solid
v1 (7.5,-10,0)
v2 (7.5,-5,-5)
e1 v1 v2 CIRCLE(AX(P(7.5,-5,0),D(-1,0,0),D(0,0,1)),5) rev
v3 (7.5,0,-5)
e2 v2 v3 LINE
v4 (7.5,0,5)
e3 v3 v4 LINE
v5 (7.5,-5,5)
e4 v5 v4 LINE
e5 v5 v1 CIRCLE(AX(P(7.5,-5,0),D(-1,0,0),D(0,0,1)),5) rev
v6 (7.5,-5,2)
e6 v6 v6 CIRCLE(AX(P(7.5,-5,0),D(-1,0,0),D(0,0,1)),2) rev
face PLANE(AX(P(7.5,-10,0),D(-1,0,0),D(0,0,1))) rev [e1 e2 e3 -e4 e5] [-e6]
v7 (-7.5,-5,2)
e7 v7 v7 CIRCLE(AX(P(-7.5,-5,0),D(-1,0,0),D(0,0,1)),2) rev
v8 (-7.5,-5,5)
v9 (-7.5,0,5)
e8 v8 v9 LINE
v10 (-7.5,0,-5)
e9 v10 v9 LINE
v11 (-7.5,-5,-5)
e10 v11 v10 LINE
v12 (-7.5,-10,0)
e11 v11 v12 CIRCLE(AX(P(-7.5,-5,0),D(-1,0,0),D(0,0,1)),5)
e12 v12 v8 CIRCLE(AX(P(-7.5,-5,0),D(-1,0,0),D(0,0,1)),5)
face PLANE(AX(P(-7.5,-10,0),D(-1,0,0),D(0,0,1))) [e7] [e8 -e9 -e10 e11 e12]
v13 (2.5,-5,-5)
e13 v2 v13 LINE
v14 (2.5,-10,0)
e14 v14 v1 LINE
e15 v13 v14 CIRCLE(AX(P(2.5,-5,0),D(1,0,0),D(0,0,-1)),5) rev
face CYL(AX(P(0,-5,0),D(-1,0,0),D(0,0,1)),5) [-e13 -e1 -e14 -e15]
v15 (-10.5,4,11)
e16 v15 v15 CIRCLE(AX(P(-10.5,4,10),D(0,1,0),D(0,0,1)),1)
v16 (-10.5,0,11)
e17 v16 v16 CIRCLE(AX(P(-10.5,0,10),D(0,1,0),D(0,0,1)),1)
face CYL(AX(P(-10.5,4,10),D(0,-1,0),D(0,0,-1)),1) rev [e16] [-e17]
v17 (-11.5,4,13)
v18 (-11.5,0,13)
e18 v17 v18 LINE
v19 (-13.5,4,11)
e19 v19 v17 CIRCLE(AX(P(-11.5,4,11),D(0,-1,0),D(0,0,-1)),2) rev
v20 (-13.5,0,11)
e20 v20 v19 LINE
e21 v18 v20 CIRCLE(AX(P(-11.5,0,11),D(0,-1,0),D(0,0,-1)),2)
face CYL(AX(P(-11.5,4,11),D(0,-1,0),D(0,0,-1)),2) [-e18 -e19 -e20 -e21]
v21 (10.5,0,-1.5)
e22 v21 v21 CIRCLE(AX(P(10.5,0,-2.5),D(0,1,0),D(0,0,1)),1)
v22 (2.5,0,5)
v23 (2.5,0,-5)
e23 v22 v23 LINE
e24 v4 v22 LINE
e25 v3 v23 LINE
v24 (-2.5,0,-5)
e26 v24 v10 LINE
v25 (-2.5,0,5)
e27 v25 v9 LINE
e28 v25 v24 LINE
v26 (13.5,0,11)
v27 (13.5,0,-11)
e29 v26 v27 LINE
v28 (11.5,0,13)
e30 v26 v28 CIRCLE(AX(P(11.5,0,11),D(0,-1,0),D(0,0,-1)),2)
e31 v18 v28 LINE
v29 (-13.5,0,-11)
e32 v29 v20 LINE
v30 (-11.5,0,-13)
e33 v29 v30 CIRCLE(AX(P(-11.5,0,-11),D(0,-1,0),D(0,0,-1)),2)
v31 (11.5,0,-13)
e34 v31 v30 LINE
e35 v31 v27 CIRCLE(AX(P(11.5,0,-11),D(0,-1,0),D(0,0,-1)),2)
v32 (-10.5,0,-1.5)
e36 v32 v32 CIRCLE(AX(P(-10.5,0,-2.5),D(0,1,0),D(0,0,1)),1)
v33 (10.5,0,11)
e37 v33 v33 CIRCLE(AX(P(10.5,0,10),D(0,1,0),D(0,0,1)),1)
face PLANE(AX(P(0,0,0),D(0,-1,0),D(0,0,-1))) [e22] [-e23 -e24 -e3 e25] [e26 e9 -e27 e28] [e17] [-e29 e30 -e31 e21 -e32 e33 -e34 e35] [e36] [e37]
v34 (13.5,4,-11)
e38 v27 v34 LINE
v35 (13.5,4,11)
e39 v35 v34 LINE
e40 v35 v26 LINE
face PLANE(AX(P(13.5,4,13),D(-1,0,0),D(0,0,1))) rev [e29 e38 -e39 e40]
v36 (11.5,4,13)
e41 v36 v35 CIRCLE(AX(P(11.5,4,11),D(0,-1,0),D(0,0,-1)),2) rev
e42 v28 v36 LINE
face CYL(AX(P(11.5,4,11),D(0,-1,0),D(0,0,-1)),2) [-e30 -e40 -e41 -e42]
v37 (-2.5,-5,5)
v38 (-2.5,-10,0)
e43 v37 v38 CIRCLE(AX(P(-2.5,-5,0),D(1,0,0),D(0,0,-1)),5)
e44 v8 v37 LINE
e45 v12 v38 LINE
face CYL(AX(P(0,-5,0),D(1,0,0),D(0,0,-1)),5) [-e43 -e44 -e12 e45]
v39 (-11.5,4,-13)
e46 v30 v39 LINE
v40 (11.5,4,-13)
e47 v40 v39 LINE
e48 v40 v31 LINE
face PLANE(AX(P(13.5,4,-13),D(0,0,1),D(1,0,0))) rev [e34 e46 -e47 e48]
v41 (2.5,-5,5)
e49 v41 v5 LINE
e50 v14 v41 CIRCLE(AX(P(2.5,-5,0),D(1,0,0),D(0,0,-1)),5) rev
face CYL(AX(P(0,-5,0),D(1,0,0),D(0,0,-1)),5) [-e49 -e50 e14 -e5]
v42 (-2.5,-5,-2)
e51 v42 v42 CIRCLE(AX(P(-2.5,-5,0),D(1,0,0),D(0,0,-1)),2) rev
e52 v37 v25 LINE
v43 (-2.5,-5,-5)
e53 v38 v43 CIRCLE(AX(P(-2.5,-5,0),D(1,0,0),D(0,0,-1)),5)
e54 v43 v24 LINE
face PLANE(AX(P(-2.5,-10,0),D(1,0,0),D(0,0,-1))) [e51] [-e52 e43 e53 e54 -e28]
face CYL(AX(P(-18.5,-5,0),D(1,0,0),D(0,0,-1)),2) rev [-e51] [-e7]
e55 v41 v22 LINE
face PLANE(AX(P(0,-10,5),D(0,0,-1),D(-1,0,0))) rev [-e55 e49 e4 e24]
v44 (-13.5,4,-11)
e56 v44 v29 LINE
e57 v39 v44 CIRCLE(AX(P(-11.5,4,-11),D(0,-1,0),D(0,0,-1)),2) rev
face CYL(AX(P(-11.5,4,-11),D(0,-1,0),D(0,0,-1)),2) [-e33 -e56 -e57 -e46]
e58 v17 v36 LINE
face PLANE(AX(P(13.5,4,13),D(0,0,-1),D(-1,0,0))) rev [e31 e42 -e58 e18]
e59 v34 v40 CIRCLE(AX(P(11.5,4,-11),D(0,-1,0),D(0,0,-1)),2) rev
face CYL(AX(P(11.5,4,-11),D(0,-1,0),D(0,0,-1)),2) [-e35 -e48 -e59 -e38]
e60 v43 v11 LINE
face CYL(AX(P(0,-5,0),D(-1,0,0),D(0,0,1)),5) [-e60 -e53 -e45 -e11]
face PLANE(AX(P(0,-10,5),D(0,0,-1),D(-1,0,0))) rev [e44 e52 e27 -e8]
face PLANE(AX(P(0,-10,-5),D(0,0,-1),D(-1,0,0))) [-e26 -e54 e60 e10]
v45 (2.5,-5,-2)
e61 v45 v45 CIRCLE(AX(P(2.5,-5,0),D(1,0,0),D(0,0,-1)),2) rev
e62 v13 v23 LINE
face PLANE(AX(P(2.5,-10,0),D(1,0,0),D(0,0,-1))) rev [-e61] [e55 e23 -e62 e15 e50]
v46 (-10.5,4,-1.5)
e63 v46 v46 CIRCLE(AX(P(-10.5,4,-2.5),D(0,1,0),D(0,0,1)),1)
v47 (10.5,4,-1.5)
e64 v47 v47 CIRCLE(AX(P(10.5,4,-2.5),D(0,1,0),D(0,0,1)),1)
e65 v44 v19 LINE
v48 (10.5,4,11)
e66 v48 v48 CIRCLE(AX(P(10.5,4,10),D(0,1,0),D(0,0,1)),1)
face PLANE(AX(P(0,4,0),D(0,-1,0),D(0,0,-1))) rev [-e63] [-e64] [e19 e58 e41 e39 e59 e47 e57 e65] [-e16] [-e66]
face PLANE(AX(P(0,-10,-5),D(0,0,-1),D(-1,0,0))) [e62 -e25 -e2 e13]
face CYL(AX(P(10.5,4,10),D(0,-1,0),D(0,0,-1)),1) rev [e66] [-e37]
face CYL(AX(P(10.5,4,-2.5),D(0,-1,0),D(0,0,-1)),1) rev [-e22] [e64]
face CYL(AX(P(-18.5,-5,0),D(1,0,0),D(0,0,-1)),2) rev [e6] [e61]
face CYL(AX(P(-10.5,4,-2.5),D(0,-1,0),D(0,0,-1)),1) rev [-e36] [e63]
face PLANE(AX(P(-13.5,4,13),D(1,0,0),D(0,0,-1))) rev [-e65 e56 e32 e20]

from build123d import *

# Parameters (mm, degrees)
SKETCH1_W               = 27
SKETCH1_H               = 26
SKETCH1_R               = 1
BOSS_EXTRUDE1_DEPTH     = 4
SKETCH2_W               = 5
SKETCH2_H               = 10
BOSS_EXTRUDE2_DEPTH     = 10
FILLET1_R               = 5
CUT_EXTRUDE1_DEPTH      = 11
CUT_EXTRUDE1_DEPTH_BACK = 22
SKETCH4_R               = 2
FILLET2_R               = 2


with BuildPart() as part:
    # Sketch1 → Boss-Extrude1 (new body)
    with BuildSketch(Plane(origin=(0, 0, 0), x_dir=(1, 0, 0), z_dir=(0, 1, 0))):
        Rectangle(SKETCH1_W, SKETCH1_H)
        with Locations(Location((-10.5, 2.5, 0), (0, 0, 270))):
            Circle(SKETCH1_R, mode=Mode.SUBTRACT)
        with Locations(Location((-10.5, -10, 0), (0, 0, 270))):
            Circle(SKETCH1_R, mode=Mode.SUBTRACT)
        with Locations(Location((10.5, -10, 0), (0, 0, 270))):
            Circle(SKETCH1_R, mode=Mode.SUBTRACT)
        with Locations(Location((10.5, 2.5, 0), (0, 0, 270))):
            Circle(SKETCH1_R, mode=Mode.SUBTRACT)
    extrude(amount=BOSS_EXTRUDE1_DEPTH)

    # Sketch2 → Boss-Extrude2 (add)
    with BuildSketch(Plane.XZ):
        with Locations((-5, 0)):
            Rectangle(SKETCH2_W, SKETCH2_H)
        with Locations((5, 0)):
            Rectangle(SKETCH2_W, SKETCH2_H)
    extrude(amount=BOSS_EXTRUDE2_DEPTH)

    # Fillet1
    fillet1_edges = [part.edges().sort_by_distance(p)[0] for p in [
        (5, -10, 5),
        (5, -10, -5),
        (-5, -10, 5),
        (-5, -10, -5),
    ]]
    fillet(fillet1_edges, radius=FILLET1_R - 0.0001)  # a hair under: the kernel refuses the full size

    # Sketch4 → Cut-Extrude1 (cut, two sides: drawn at the far end of the back side and taken through both)
    with BuildSketch(Plane.ZY.offset(7.5).offset(-CUT_EXTRUDE1_DEPTH_BACK)):
        with Locations(Location((0, -5, 0), (0, 0, 180))):
            Circle(SKETCH4_R)
    extrude(amount=CUT_EXTRUDE1_DEPTH + CUT_EXTRUDE1_DEPTH_BACK, mode=Mode.SUBTRACT)

    # Fillet2
    fillet2_edges = [part.edges().sort_by_distance(p)[0] for p in [
        (-13.5, 2, 13),
        (-13.5, 2, -13),
        (13.5, 2, -13),
        (13.5, 2, 13),
    ]]
    fillet(fillet2_edges, radius=FILLET2_R)


solid = part.part
